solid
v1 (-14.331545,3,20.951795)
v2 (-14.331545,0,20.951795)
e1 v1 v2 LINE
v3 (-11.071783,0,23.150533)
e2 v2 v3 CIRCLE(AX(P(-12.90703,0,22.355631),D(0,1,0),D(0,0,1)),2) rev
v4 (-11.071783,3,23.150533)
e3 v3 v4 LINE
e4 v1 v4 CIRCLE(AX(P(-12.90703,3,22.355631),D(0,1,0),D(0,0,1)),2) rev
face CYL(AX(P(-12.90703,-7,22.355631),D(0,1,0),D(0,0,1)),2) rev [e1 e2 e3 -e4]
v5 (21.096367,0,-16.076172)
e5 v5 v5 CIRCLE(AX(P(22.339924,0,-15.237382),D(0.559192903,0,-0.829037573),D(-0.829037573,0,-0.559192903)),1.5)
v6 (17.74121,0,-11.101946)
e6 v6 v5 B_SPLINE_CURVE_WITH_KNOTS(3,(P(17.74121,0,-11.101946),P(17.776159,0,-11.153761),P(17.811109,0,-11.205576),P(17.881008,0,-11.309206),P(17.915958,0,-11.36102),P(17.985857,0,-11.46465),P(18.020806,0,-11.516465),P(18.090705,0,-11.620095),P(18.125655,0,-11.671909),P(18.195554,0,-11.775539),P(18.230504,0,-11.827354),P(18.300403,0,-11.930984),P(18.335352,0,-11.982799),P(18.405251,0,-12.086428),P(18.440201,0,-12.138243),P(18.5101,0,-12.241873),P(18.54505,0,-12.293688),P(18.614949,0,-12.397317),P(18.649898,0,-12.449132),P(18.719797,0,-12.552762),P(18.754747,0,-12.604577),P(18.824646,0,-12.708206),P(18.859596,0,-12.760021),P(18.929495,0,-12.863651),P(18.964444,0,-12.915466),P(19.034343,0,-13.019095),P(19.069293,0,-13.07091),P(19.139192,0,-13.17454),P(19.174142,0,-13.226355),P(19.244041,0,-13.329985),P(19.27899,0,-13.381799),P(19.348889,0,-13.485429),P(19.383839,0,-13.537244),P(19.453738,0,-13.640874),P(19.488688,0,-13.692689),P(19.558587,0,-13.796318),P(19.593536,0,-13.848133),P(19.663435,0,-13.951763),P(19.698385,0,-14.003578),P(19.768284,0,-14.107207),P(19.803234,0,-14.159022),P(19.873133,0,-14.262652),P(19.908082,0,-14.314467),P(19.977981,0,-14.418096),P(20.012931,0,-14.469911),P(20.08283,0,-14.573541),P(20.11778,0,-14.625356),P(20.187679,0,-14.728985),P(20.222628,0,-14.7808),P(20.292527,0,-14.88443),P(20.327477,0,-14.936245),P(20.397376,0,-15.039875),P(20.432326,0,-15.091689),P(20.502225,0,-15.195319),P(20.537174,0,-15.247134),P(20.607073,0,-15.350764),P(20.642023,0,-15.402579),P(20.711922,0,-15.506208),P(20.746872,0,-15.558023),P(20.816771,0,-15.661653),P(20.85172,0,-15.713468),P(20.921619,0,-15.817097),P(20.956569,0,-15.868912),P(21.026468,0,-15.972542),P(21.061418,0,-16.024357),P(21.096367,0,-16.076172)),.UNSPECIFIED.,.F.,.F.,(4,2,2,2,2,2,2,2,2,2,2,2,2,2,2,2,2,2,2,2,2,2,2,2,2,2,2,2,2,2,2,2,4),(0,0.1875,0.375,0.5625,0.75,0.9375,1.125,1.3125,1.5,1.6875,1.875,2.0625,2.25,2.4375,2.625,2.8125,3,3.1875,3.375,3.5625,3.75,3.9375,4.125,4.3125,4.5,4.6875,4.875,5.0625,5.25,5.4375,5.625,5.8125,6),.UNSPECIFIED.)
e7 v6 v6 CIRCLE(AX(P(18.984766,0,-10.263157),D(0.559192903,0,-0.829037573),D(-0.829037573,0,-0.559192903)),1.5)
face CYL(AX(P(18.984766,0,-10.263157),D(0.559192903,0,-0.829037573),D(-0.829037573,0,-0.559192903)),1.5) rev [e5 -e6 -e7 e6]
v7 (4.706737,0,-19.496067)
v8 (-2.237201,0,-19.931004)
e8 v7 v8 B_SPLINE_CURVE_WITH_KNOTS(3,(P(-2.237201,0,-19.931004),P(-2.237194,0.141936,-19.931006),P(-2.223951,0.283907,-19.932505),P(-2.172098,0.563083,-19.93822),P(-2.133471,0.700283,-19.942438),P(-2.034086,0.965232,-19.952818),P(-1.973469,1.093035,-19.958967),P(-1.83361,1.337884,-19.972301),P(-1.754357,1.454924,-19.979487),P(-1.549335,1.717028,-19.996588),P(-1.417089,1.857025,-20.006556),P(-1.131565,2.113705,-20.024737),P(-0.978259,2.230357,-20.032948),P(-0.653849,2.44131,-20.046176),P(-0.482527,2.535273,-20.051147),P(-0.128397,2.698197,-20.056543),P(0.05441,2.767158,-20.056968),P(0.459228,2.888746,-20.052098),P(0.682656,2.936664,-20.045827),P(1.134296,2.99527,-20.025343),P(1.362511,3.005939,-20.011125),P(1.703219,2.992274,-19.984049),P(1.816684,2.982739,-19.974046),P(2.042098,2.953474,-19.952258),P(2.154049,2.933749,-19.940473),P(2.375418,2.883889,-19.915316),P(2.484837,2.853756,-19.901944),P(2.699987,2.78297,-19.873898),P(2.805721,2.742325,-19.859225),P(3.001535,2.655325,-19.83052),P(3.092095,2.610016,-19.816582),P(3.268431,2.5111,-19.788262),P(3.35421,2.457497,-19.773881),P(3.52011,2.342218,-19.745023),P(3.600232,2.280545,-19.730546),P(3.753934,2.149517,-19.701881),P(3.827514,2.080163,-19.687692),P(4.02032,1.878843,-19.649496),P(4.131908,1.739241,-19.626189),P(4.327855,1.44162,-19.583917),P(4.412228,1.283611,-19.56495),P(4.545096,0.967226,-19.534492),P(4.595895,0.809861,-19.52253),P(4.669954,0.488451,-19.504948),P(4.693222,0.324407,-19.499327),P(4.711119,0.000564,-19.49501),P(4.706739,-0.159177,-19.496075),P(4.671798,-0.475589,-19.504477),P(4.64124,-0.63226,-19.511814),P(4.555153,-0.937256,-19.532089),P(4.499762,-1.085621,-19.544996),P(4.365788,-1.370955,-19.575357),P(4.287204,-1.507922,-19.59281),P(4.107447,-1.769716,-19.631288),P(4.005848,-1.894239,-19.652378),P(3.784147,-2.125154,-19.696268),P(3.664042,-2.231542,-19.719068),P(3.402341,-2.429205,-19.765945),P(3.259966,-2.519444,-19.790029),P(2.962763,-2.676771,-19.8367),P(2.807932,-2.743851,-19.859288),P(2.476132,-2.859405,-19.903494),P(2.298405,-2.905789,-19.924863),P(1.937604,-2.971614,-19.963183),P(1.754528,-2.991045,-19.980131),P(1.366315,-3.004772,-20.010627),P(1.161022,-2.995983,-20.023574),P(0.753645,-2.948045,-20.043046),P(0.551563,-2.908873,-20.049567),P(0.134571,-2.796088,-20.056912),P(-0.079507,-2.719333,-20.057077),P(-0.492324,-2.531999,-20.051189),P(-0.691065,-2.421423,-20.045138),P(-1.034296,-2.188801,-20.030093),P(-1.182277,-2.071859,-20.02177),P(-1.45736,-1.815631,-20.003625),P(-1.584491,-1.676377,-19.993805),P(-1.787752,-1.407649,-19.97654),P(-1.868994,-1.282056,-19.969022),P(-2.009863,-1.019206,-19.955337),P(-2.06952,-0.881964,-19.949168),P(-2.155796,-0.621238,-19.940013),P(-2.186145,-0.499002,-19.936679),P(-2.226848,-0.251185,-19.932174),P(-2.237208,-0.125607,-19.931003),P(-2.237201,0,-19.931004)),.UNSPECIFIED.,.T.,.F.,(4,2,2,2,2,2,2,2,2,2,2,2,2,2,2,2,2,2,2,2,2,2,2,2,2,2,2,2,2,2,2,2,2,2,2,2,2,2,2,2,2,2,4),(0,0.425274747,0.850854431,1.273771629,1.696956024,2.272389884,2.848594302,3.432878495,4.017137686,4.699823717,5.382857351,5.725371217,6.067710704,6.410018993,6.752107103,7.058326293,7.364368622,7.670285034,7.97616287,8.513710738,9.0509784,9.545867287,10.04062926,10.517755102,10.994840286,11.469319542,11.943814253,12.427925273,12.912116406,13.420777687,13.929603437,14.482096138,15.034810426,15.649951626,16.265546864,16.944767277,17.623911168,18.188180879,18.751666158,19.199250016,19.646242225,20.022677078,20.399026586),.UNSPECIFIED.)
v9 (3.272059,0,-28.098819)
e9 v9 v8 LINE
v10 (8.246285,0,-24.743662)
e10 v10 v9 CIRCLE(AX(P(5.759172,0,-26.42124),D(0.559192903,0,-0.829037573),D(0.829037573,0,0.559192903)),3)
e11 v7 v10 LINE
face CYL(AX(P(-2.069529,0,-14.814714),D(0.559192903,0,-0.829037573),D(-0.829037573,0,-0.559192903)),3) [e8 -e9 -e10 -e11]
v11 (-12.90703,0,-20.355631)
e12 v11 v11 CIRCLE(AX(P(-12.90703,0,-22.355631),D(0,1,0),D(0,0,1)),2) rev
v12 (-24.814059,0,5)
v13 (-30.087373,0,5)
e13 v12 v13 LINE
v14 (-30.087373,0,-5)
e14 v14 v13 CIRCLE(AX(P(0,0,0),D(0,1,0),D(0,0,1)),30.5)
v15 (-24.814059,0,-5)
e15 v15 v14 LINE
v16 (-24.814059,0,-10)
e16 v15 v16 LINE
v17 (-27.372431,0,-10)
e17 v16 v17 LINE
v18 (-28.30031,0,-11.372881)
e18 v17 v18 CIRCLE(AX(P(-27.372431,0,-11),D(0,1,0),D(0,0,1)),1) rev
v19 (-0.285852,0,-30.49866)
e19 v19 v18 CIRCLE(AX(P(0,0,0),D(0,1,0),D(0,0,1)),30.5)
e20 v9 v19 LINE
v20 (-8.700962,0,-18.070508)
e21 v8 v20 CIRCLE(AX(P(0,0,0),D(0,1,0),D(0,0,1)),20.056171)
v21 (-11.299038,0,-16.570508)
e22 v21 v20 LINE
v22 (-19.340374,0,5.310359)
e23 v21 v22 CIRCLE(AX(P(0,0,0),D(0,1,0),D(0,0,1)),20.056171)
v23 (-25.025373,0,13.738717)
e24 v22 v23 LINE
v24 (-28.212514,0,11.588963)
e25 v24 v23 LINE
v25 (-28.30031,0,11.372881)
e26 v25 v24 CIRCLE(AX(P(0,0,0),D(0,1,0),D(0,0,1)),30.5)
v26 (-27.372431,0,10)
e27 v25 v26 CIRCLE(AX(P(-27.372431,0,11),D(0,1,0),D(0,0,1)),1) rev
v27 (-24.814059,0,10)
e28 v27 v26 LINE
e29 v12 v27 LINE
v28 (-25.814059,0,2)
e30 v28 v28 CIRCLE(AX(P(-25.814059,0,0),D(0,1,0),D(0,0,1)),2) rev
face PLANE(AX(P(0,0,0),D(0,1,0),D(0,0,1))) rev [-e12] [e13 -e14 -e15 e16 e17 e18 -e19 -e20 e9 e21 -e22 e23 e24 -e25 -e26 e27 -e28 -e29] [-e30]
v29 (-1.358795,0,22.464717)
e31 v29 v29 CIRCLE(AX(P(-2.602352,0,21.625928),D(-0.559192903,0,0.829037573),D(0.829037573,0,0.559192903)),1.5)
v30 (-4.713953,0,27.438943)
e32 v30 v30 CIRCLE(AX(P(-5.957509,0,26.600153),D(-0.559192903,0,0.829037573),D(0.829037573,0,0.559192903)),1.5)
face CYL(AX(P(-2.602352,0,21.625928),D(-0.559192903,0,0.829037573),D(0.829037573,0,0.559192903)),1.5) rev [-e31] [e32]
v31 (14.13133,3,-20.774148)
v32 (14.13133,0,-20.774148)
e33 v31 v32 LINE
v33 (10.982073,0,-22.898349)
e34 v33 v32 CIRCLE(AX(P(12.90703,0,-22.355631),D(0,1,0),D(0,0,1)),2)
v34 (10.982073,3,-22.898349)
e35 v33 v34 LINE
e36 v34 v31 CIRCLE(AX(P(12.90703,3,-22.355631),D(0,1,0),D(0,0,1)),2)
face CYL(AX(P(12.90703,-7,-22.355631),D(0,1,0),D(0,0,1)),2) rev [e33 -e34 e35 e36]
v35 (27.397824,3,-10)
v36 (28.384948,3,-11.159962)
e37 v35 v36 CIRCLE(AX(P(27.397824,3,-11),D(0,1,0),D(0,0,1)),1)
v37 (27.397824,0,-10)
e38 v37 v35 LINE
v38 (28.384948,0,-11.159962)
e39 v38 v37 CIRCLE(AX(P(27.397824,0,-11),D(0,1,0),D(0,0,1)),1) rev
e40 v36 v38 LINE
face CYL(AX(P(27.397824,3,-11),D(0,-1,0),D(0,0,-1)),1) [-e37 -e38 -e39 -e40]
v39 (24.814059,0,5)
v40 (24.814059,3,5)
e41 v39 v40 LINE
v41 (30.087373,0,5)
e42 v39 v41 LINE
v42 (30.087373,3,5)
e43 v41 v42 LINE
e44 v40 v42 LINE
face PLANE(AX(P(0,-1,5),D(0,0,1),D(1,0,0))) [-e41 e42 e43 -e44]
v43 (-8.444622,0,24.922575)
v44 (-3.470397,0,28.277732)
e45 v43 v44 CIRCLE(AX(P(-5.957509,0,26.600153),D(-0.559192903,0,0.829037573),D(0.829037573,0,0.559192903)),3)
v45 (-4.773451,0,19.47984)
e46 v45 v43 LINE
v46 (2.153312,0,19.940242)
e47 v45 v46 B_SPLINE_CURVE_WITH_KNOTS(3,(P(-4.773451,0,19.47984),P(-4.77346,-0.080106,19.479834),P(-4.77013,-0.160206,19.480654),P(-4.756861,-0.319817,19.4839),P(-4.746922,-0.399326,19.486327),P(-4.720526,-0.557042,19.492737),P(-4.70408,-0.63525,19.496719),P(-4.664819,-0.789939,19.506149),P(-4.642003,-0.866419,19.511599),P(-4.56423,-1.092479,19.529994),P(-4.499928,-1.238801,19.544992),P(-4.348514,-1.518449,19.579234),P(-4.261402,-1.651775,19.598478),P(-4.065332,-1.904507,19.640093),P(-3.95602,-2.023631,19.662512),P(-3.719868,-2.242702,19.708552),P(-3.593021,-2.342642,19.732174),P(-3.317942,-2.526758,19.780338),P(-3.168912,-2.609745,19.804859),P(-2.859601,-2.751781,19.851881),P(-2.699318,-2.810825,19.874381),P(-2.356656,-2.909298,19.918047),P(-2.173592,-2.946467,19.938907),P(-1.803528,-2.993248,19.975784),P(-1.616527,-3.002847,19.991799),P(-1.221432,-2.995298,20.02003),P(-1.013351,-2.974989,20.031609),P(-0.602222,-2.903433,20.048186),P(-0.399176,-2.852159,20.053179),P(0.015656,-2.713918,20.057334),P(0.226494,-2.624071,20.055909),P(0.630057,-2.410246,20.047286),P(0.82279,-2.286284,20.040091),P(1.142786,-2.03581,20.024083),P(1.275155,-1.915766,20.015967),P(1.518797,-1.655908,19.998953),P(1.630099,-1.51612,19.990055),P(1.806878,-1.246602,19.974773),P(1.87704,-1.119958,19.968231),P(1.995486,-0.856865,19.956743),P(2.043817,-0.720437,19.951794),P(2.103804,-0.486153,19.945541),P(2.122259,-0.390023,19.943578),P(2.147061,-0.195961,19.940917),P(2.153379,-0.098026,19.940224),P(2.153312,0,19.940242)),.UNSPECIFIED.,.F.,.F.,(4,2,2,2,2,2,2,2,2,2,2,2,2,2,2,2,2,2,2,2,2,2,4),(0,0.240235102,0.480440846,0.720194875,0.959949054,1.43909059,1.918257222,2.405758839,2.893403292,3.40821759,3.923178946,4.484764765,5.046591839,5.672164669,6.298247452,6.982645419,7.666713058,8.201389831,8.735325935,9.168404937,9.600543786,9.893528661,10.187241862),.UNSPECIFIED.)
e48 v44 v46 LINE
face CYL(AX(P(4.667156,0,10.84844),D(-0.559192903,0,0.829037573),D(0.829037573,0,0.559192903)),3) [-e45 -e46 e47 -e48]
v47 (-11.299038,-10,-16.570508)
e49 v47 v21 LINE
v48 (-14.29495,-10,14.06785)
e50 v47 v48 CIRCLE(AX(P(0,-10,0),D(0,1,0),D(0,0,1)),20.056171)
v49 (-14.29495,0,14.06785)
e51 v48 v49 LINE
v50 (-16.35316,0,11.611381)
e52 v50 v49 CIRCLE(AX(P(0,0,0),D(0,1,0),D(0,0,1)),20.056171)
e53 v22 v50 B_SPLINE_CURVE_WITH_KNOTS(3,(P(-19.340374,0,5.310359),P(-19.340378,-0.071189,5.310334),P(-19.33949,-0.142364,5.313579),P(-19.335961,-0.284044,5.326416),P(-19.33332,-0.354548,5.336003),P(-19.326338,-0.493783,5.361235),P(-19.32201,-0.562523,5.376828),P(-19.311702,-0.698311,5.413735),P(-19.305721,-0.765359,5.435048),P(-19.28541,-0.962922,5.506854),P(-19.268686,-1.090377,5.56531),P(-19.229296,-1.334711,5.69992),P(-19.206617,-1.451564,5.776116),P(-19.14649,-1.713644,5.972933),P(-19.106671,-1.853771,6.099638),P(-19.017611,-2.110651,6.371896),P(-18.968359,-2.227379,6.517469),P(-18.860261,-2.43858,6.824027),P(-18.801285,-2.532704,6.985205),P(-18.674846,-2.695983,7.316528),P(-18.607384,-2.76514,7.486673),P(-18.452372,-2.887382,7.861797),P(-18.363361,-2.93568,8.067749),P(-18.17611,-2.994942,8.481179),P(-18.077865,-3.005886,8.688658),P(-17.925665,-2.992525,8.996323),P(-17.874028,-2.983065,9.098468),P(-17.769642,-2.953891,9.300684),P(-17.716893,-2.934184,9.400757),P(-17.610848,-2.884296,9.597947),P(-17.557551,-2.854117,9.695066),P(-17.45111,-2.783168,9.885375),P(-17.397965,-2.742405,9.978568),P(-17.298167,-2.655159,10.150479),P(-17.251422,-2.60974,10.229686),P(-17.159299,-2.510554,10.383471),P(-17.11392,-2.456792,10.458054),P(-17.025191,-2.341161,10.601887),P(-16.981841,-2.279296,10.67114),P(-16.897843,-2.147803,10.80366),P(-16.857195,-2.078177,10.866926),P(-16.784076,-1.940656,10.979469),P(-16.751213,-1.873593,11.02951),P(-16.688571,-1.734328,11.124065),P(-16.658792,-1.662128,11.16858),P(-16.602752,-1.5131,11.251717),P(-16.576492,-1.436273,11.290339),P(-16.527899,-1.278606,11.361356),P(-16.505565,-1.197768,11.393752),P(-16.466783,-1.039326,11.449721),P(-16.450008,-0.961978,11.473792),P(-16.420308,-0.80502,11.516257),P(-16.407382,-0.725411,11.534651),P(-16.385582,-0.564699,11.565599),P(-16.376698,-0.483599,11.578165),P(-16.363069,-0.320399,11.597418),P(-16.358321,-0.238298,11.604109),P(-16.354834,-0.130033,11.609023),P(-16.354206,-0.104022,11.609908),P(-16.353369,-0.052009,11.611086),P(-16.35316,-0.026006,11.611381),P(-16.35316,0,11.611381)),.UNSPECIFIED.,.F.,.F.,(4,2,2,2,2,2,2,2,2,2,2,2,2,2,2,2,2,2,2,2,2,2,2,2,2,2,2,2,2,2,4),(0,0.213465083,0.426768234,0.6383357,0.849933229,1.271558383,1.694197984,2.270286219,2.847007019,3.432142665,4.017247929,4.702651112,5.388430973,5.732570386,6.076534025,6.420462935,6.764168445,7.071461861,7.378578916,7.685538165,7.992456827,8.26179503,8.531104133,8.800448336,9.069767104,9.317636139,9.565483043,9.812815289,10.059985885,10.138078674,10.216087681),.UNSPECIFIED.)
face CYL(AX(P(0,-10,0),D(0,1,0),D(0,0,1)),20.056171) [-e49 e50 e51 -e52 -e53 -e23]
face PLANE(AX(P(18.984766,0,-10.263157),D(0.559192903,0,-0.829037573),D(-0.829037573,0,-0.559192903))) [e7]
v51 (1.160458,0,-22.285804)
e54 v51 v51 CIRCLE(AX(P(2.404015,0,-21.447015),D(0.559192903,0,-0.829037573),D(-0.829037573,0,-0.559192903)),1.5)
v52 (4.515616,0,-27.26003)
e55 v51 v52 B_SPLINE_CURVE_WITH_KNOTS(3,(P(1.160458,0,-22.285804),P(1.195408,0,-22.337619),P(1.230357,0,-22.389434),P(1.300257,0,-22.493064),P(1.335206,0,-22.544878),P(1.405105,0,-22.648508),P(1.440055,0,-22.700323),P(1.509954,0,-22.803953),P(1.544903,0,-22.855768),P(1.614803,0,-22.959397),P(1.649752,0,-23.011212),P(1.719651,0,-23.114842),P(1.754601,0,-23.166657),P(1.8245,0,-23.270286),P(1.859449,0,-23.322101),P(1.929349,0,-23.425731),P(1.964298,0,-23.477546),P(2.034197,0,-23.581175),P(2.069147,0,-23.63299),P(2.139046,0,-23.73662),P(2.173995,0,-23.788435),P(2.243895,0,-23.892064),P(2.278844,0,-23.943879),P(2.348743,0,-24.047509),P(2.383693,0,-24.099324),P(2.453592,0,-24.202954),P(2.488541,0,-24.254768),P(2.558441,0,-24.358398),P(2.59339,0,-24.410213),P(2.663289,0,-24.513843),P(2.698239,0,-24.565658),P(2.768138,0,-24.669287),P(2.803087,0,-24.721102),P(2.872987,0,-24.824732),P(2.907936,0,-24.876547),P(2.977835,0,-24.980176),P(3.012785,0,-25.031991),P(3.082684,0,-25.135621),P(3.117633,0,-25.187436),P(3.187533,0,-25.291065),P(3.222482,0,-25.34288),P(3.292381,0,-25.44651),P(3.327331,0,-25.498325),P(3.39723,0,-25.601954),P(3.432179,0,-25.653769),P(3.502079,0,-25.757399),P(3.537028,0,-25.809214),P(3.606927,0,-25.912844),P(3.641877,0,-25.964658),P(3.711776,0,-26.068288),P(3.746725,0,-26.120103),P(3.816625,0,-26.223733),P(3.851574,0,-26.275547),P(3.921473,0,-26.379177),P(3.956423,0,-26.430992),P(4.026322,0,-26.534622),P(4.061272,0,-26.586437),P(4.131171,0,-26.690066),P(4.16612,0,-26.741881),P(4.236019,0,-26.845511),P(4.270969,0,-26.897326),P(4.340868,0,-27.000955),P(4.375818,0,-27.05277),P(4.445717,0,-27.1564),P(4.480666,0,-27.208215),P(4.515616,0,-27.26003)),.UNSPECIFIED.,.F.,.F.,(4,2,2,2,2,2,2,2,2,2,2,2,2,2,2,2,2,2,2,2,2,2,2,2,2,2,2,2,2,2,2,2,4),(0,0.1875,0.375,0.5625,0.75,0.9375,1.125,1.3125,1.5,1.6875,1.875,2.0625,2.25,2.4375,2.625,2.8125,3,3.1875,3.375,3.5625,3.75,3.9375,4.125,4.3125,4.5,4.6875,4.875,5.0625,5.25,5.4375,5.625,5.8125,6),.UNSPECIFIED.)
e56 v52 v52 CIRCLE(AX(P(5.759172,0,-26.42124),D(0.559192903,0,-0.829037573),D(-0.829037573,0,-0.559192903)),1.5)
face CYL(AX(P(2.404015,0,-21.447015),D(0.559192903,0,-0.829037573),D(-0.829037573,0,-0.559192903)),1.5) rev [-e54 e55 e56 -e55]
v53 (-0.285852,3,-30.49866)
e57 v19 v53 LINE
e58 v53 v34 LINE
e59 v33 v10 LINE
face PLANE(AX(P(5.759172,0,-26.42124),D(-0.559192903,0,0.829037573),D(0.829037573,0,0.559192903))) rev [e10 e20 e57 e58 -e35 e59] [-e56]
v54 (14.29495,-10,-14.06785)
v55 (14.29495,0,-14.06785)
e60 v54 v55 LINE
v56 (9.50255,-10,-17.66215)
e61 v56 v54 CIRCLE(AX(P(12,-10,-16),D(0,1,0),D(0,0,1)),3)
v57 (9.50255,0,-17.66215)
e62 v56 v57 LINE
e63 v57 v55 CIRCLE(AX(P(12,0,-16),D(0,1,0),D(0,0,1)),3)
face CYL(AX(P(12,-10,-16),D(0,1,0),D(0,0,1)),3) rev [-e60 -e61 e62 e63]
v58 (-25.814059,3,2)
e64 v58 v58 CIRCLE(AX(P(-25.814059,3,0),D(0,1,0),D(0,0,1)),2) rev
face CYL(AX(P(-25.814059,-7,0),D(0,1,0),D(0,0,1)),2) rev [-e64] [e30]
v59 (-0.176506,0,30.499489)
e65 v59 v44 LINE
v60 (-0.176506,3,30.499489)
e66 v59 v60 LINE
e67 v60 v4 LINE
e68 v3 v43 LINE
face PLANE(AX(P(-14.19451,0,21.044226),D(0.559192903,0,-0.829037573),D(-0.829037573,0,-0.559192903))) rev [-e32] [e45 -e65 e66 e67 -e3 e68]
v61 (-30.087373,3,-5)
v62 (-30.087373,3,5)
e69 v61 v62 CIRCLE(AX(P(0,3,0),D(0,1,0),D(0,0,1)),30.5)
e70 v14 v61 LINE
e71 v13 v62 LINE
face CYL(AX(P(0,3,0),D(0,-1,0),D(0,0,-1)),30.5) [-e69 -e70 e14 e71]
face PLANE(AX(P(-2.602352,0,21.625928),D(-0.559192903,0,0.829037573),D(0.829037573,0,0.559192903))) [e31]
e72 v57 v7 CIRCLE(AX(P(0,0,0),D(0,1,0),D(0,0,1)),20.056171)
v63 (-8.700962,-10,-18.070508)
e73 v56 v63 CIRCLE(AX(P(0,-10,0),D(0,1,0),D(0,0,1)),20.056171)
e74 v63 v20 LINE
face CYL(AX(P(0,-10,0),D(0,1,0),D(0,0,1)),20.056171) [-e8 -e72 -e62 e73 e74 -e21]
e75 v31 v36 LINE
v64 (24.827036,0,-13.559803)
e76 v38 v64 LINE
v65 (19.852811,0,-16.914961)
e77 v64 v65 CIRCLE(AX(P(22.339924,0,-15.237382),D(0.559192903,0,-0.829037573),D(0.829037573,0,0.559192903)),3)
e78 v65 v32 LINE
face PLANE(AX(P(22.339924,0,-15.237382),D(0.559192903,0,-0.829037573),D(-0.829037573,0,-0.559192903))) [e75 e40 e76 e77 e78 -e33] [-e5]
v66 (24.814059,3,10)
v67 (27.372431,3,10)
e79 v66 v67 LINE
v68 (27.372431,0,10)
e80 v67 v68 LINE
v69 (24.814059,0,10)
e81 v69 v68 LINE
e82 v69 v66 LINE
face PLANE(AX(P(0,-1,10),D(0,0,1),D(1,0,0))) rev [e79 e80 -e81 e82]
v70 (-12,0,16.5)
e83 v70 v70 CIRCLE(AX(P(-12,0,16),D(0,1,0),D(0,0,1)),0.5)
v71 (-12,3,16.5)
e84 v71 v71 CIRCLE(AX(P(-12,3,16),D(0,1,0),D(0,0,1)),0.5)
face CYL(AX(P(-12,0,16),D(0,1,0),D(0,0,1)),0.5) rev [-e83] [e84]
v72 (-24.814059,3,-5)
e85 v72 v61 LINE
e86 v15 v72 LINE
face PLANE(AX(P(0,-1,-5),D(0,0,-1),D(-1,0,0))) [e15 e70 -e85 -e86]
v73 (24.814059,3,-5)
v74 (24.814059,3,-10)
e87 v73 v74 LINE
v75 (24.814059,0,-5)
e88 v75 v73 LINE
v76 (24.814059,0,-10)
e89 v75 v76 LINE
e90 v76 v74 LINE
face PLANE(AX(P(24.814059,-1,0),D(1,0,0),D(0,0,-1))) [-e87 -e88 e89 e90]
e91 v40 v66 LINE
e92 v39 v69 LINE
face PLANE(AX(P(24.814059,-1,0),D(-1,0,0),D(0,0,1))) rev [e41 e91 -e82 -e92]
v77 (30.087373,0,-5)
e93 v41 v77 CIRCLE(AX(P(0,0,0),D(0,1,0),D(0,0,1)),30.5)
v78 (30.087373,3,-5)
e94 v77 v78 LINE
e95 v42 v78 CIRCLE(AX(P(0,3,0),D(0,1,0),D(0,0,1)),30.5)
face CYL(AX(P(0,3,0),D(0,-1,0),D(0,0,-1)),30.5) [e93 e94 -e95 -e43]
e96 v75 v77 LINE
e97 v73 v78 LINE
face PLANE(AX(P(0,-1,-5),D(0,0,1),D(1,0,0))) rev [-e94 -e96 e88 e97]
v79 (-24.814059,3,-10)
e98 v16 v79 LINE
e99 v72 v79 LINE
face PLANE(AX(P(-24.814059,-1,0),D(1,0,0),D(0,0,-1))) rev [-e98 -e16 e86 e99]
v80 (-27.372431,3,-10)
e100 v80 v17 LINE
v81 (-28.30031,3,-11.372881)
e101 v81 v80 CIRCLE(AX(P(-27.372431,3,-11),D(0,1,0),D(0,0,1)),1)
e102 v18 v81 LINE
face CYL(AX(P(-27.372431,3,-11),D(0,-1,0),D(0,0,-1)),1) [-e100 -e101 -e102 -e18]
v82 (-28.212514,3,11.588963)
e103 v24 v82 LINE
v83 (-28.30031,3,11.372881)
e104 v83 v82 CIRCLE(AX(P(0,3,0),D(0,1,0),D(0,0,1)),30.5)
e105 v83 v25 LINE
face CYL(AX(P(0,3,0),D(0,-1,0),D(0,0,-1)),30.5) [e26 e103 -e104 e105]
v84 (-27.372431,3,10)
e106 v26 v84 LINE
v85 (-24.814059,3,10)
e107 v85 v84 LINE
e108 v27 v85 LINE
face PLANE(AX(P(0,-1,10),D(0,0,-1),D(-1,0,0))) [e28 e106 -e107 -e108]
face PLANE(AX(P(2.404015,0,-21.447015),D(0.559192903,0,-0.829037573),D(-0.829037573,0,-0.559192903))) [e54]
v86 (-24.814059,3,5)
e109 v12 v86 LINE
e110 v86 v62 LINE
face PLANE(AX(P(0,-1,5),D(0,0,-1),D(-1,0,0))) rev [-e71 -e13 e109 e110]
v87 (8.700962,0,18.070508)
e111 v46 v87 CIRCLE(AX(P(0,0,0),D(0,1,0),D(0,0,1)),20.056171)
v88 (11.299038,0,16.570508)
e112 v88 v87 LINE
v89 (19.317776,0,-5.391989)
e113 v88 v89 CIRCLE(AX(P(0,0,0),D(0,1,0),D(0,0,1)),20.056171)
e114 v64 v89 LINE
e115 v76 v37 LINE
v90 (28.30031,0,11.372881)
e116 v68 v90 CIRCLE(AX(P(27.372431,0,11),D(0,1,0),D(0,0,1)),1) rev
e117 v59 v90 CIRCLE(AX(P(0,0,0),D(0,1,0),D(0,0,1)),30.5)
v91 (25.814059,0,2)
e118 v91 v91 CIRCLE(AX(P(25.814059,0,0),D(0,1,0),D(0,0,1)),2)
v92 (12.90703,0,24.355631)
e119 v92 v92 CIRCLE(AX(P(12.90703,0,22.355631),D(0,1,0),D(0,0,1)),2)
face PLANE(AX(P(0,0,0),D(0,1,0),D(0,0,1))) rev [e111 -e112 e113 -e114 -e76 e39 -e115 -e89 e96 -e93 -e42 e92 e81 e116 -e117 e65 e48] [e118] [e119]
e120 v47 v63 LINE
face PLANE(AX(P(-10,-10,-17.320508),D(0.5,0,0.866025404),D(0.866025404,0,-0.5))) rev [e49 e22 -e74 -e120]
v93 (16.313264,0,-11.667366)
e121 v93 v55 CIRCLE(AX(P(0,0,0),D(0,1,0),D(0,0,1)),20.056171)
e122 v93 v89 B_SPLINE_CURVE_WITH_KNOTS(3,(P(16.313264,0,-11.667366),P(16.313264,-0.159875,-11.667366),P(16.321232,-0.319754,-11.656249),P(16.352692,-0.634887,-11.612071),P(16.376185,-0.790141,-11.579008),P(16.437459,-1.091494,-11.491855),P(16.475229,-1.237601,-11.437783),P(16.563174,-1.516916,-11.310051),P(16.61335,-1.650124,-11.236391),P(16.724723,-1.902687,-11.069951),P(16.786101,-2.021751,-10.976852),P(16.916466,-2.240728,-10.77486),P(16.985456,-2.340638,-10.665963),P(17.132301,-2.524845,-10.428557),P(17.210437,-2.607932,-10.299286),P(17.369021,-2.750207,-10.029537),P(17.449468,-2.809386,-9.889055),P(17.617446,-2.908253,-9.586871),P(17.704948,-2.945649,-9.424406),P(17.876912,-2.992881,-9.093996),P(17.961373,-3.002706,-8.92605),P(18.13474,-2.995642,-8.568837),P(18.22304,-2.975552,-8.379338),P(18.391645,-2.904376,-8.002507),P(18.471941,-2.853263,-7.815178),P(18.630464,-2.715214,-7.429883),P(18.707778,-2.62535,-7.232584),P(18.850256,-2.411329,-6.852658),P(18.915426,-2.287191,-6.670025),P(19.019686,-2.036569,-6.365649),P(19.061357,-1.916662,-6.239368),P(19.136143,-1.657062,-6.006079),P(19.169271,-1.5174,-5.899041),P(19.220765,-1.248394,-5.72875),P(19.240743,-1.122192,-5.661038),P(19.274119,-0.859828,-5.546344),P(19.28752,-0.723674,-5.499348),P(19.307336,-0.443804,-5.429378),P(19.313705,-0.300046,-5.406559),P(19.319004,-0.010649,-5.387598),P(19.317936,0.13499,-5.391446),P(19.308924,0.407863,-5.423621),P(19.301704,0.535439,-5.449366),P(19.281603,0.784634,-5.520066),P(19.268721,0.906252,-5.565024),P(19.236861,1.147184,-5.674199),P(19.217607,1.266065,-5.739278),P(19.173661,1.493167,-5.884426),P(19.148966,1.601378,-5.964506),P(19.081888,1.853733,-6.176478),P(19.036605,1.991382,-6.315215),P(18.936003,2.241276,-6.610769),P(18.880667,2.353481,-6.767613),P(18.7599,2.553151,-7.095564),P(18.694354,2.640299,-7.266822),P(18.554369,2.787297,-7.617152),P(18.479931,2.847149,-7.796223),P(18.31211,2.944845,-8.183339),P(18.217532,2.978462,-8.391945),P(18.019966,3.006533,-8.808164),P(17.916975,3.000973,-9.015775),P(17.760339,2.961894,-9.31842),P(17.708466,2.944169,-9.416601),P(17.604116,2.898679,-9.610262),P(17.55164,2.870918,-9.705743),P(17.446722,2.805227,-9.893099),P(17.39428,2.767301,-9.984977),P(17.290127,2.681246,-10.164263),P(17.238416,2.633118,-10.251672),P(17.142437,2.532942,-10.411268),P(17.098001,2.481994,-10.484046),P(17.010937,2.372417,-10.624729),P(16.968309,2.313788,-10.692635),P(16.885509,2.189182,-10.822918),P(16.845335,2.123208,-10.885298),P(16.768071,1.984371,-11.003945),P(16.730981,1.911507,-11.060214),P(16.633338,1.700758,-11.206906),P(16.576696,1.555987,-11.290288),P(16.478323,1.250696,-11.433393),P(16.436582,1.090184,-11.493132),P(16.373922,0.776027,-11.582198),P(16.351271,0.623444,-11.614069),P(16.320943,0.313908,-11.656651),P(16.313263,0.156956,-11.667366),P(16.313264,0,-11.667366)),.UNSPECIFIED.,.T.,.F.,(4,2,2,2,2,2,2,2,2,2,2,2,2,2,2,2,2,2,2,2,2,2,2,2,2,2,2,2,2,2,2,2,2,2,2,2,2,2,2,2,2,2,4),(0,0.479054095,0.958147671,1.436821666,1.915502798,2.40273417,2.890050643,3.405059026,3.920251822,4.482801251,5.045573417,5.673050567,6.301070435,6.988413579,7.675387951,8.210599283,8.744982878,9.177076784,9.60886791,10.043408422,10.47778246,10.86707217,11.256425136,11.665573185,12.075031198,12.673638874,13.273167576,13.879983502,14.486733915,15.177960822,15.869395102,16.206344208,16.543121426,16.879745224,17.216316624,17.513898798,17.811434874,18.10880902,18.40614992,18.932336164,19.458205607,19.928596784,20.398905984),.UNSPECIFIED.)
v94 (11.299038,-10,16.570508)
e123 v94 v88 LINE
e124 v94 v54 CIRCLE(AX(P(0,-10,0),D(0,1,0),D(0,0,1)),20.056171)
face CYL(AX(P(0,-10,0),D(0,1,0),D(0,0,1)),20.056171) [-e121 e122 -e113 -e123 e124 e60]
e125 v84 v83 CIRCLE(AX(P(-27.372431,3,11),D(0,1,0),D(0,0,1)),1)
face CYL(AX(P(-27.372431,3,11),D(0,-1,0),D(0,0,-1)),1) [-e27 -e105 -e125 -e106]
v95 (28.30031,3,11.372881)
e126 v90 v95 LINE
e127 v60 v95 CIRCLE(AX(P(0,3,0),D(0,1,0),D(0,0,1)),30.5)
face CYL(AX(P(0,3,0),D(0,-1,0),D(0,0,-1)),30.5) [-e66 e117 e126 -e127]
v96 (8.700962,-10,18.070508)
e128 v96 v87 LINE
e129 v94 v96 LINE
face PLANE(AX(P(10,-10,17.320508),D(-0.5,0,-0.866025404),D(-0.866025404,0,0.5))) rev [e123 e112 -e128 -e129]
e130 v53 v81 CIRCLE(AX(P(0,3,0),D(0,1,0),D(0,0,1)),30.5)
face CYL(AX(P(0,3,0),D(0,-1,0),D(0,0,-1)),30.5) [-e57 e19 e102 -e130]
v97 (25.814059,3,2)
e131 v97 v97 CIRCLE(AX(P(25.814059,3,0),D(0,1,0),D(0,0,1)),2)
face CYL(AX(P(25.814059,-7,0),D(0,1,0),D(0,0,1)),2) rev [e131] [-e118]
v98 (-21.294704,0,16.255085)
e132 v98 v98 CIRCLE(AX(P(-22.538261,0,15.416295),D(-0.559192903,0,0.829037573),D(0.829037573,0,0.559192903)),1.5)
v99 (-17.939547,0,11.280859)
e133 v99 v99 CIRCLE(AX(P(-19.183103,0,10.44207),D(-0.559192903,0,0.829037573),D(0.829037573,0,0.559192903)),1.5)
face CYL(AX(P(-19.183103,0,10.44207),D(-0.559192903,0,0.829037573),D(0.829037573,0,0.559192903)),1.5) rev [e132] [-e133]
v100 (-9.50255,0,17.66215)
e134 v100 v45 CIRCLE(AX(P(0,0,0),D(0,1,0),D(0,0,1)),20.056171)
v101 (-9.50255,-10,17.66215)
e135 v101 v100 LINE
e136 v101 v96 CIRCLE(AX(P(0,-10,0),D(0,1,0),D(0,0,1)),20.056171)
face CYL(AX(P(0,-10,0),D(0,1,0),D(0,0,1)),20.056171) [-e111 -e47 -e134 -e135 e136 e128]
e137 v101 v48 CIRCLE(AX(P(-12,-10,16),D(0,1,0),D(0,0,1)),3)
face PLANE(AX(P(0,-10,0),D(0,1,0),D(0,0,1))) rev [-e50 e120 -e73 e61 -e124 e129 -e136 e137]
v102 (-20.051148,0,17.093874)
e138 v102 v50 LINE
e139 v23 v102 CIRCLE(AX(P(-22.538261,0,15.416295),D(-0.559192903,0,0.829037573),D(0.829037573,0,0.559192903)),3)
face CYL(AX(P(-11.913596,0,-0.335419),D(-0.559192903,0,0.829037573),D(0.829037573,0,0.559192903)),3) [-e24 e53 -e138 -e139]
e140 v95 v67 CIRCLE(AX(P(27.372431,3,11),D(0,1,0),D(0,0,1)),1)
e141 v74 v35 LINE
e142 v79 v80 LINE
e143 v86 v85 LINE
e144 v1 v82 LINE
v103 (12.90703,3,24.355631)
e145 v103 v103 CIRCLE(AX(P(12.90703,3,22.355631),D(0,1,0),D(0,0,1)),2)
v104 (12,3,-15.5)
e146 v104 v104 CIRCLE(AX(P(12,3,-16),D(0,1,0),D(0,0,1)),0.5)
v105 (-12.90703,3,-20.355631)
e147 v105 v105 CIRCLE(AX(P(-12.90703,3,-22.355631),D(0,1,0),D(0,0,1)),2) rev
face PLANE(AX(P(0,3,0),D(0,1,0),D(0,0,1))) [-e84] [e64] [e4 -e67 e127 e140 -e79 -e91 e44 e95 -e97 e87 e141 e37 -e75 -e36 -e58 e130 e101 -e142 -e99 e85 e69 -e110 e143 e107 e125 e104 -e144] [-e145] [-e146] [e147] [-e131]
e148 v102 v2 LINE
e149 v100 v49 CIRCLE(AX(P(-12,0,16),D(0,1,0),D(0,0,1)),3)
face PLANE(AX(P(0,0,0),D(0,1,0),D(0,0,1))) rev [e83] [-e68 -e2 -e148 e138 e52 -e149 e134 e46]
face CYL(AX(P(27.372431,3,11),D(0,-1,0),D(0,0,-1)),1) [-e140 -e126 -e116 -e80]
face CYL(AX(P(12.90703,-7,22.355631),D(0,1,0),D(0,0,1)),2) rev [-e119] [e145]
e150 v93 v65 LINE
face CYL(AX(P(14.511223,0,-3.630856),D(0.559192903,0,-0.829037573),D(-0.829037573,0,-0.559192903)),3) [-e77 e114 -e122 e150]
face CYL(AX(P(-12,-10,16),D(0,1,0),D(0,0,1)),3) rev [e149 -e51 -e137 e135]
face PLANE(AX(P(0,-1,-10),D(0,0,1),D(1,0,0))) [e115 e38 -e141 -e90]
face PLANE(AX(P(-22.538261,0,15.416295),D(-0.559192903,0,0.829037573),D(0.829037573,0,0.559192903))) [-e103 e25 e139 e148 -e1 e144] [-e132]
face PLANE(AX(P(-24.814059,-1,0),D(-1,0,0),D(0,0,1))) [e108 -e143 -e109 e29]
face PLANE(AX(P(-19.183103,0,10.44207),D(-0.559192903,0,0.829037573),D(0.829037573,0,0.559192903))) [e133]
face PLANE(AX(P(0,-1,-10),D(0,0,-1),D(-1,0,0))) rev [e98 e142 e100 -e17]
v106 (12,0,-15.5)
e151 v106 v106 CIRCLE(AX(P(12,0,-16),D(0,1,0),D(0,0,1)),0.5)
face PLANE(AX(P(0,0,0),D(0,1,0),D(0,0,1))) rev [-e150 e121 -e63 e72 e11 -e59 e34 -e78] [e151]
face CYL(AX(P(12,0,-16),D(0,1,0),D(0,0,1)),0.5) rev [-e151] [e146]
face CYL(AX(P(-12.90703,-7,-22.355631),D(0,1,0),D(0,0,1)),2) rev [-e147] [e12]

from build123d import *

# Parameters (mm, degrees)
CROQUIS1_R              = 30.5
SALIENTE_EXTRUIR1_DEPTH = 3
CORTAR_EXTRUIR3_START   = -4
CORTAR_EXTRUIR3_DEPTH   = 4
CORTAR_EXTRUIR4_DEPTH   = 10
CROQUIS8_R              = 0.5
CORTAR_EXTRUIR5_DEPTH   = 3
SALIENTE_EXTRUIR2_DEPTH = 13
CROQUIS11_W             = 34.583232932
CROQUIS11_H             = 3
SALIENTE_EXTRUIR3_DEPTH = 6
CROQUIS12_R             = 2
CORTAR_EXTRUIR7_DEPTH   = 3
SALIENTE_EXTRUIR4_DEPTH = 20
CROQUIS14_R             = 1.5
CORTAR_EXTRUIR8_DEPTH   = 6
CORTAR_EXTRUIR9_START   = -3
CORTAR_EXTRUIR9_DEPTH   = 3
CROQUIS16_W             = 33.68877148
CROQUIS16_H             = 3
SALIENTE_EXTRUIR5_DEPTH = 6
CROQUIS17_R             = 2
CORTAR_EXTRUIR10_DEPTH  = 3
CROQUIS18_R             = 3
SALIENTE_EXTRUIR6_DEPTH = 25
CROQUIS19_R             = 1.5
CORTAR_EXTRUIR11_DEPTH  = 5
CORTAR_EXTRUIR12_DEPTH  = 6
CORTAR_EXTRUIR13_DEPTH  = 6
CROQUIS22_R             = 1.5
CORTAR_EXTRUIR14_DEPTH  = 6
CROQUIS23_R             = 1.5
CORTAR_EXTRUIR15_DEPTH  = 6
REDONDEO1_R             = 1


with BuildPart() as part:
    # Croquis1 → Saliente-Extruir1 (new body)
    with BuildSketch(Plane(origin=(0, 0, 0), x_dir=(1, 0, 0), z_dir=(0, 1, 0))):
        with Locations(Location((0, 0, 0), (0, 0, 270))):
            Circle(CROQUIS1_R)
    extrude(amount=SALIENTE_EXTRUIR1_DEPTH)

    # Croquis5 → Cortar-Extruir3 (cut)
    with BuildSketch(Plane(origin=(0, 3, 0), x_dir=(1, 0, 0), z_dir=(0, 1, 0)).offset(CORTAR_EXTRUIR3_START)):
        with BuildLine():
            ThreePointArc((-30.087372767, -5), (-29.556634924, -7.526973624), (-28.814059068, -10))
            Line((-28.814059068, -10), (-24.814059068, -10))
            Line((-24.814059068, -10), (-24.814059068, -5))
            Line((-24.814059068, -5), (-28.814059068, -5))
            Line((-28.814059068, -5), (-30.087372767, -5))
        make_face()
        with BuildLine():
            ThreePointArc((-28.814059068, 10), (-29.556634924, 7.526973624), (-30.087372767, 5))
            Line((-30.087372767, 5), (-28.814059068, 5))
            Line((-28.814059068, 5), (-24.814059068, 5))
            Line((-24.814059068, 5), (-24.814059068, 10))
            Line((-24.814059068, 10), (-28.814059068, 10))
        make_face()
        with BuildLine():
            Line((28.814059068, 5), (30.087372767, 5))
            ThreePointArc((30.087372767, 5), (29.556634924, 7.526973624), (28.814059068, 10))
            Line((28.814059068, 10), (24.814059068, 10))
            Line((24.814059068, 10), (24.814059068, 5))
            Line((24.814059068, 5), (28.814059068, 5))
        make_face()
        with BuildLine():
            Line((30.087372767, -5), (28.814059068, -5))
            Line((28.814059068, -5), (24.814059068, -5))
            Line((24.814059068, -5), (24.814059068, -10))
            Line((24.814059068, -10), (28.814059068, -10))
            ThreePointArc((28.814059068, -10), (29.556634924, -7.526973624), (30.087372767, -5))
        make_face()
    extrude(amount=CORTAR_EXTRUIR3_DEPTH, mode=Mode.SUBTRACT)

    # Croquis7 → Cortar-Extruir4 (cut)
    with BuildSketch(Plane(origin=(0, 3, 0), x_dir=(1, 0, 0), z_dir=(0, 1, 0))):
        with BuildLine():
            ThreePointArc((-13.907029535, 20.623580122), (-11.907029535, 20.623580122), (-10.907029535, 22.355630929))
            Line((-10.907029535, 22.355630929), (-12.907029535, 22.355630929))
            Line((-12.907029535, 22.355630929), (-13.907029535, 20.623580122))
        make_face()
        with BuildLine():
            Line((-12.907029535, 22.355630929), (-10.907029535, 22.355630929))
            ThreePointArc((-10.907029535, 22.355630929), (-13.907029535, 24.087681737), (-13.907029535, 20.623580122))
            Line((-13.907029535, 20.623580122), (-12.907029535, 22.355630929))
        make_face()
        with BuildLine():
            ThreePointArc((-23.81405907, 0), (-24.082008262, 1), (-24.81405907, 1.732050808))
            Line((-24.81405907, 1.732050808), (-25.81405907, 0))
            Line((-25.81405907, 0), (-24.81405907, -1.732050808))
            ThreePointArc((-24.81405907, -1.732050808), (-24.082008262, -1), (-23.81405907, 0))
        make_face()
        with BuildLine():
            Line((-25.81405907, 0), (-24.81405907, 1.732050808))
            ThreePointArc((-24.81405907, 1.732050808), (-27.81405907, 0), (-24.81405907, -1.732050808))
            Line((-24.81405907, -1.732050808), (-25.81405907, 0))
        make_face()
        with BuildLine():
            ThreePointArc((10.907029535, 22.355630929), (11.907029535, 20.623580122), (13.907029535, 20.623580122))
            Line((13.907029535, 20.623580122), (12.907029535, 22.355630929))
            Line((12.907029535, 22.355630929), (10.907029535, 22.355630929))
        make_face()
        with BuildLine():
            Line((12.907029535, 22.355630929), (13.907029535, 20.623580122))
            ThreePointArc((13.907029535, 20.623580122), (14.639080343, 21.355630929), (14.907029535, 22.355630929))
            ThreePointArc((14.907029535, 22.355630929), (12.907029535, 24.355630929), (10.907029535, 22.355630929))
            Line((10.907029535, 22.355630929), (12.907029535, 22.355630929))
        make_face()
        with BuildLine():
            Line((24.81405907, -1.732050808), (25.81405907, 0))
            Line((25.81405907, 0), (24.81405907, 1.732050808))
            ThreePointArc((24.81405907, 1.732050808), (23.81405907, 0), (24.81405907, -1.732050808))
        make_face()
        with BuildLine():
            Line((24.81405907, 1.732050808), (25.81405907, 0))
            Line((25.81405907, 0), (24.81405907, -1.732050808))
            ThreePointArc((24.81405907, -1.732050808), (26.81405907, -1.732050808), (27.81405907, 0))
            ThreePointArc((27.81405907, 0), (26.81405907, 1.732050808), (24.81405907, 1.732050808))
        make_face()
        with BuildLine():
            ThreePointArc((-13.907029535, -20.623580122), (-13.907029535, -24.087681737), (-10.907029535, -22.355630929))
            Line((-10.907029535, -22.355630929), (-12.907029535, -22.355630929))
            Line((-12.907029535, -22.355630929), (-13.907029535, -20.623580122))
        make_face()
        with BuildLine():
            Line((-12.907029535, -22.355630929), (-10.907029535, -22.355630929))
            ThreePointArc((-10.907029535, -22.355630929), (-11.907029535, -20.623580122), (-13.907029535, -20.623580122))
            Line((-13.907029535, -20.623580122), (-12.907029535, -22.355630929))
        make_face()
        with BuildLine():
            ThreePointArc((14.907029535, -22.355630929), (14.639080343, -21.355630929), (13.907029535, -20.623580122))
            Line((13.907029535, -20.623580122), (12.907029535, -22.355630929))
            Line((12.907029535, -22.355630929), (10.907029535, -22.355630929))
            ThreePointArc((10.907029535, -22.355630929), (12.907029535, -24.355630929), (14.907029535, -22.355630929))
        make_face()
        with BuildLine():
            Line((12.907029535, -22.355630929), (13.907029535, -20.623580122))
            ThreePointArc((13.907029535, -20.623580122), (11.907029535, -20.623580122), (10.907029535, -22.355630929))
            Line((10.907029535, -22.355630929), (12.907029535, -22.355630929))
        make_face()
    extrude(amount=-CORTAR_EXTRUIR4_DEPTH, mode=Mode.SUBTRACT)

    # Croquis8 → Cortar-Extruir5 (cut)
    with BuildSketch(Plane(origin=(0, 3, 0), x_dir=(1, 0, 0), z_dir=(0, 1, 0))):
        with Locations(Location((12, 16, 0), (0, 0, 270))):
            Circle(CROQUIS8_R)
        with Locations(Location((-12, -16, 0), (0, 0, 270))):
            Circle(CROQUIS8_R)
    extrude(amount=-CORTAR_EXTRUIR5_DEPTH, mode=Mode.SUBTRACT)

    # Croquis9 → Saliente-Extruir2 (add)
    with BuildSketch(Plane(origin=(0, 3, 0), x_dir=(1, 0, 0), z_dir=(0, 1, 0))):
        with BuildLine():
            Line((-8.700961894, 18.070508076), (-10, 17.320508076))
            Line((-10, 17.320508076), (-11.299038106, 16.570508076))
            ThreePointArc((-11.299038106, 16.570508076), (-19.960969499, 1.951844427), (-14.294950117, -14.067849912))
            ThreePointArc((-14.294950117, -14.067849912), (-10.97161543, -13.181769141), (-9, -16))
            ThreePointArc((-9, -16), (-9.12838457, -16.868230859), (-9.502549883, -17.662150088))
            ThreePointArc((-9.502549883, -17.662150088), (-0.449805389, -20.05112653), (8.700961894, -18.070508076))
            Line((8.700961894, -18.070508076), (10, -17.320508076))
            Line((10, -17.320508076), (11.299038106, -16.570508076))
            ThreePointArc((11.299038106, -16.570508076), (17.732250869, -9.371087404), (20.05617112, 0))
            ThreePointArc((20.05617112, 0), (18.560064193, 7.600922125), (14.294950117, 14.067849912))
            ThreePointArc((14.294950117, 14.067849912), (10.2, 13.6), (9.502549883, 17.662150088))
            ThreePointArc((9.502549883, 17.662150088), (0.449805389, 20.05112653), (-8.700961894, 18.070508076))
        make_face()
    extrude(amount=-SALIENTE_EXTRUIR2_DEPTH)

    # Croquis11 → Saliente-Extruir3 (add)
    with BuildSketch(Plane(origin=(14.04954782, 0, -20.829311224), x_dir=(-0.8290375725550414, 0, -0.5591929034707472), z_dir=(0.5591929034707472, 0, -0.8290375725550414))):
        with Locations((0, 1.5)):
            Rectangle(CROQUIS11_W, CROQUIS11_H)
    extrude(amount=SALIENTE_EXTRUIR3_DEPTH)

    # Croquis12 → Cortar-Extruir7 (cut)
    with BuildSketch(Plane(origin=(0, 3, 0), x_dir=(1, 0, 0), z_dir=(0, 1, 0))):
        with Locations(Location((12.907029535, 22.355630929, 0), (0, 0, 270))):
            Circle(CROQUIS12_R)
    extrude(amount=-CORTAR_EXTRUIR7_DEPTH, mode=Mode.SUBTRACT)

    # Croquis13 → Saliente-Extruir4 (add)
    with BuildSketch(Plane(origin=(17.404705241, 0, -25.803536659), x_dir=(-0.8290375725550414, 0, -0.5591929034707472), z_dir=(0.5591929034707472, 0, -0.8290375725550414))):
        with BuildLine():
            ThreePointArc((10, 3), (7.878679656, 2.121320344), (7, 0))
            Line((7, 0), (8.5, 0))
            ThreePointArc((8.5, 0), (10, 1.5), (11.5, 0))
            Line((11.5, 0), (13, 0))
            ThreePointArc((13, 0), (12.121320344, 2.121320344), (10, 3))
        make_face()
        with BuildLine():
            Line((8.5, 0), (7, 0))
            ThreePointArc((7, 0), (10, -3), (13, 0))
            Line((13, 0), (11.5, 0))
            ThreePointArc((11.5, 0), (10, -1.5), (8.5, 0))
        make_face()
        with BuildLine():
            ThreePointArc((-11.5, 0), (-10, 1.5), (-8.5, 0))
            Line((-8.5, 0), (-7, 0))
            ThreePointArc((-7, 0), (-7.878679656, 2.121320343), (-9.999999999, 3))
            ThreePointArc((-9.999999999, 3), (-12.121320343, 2.121320344), (-13, 0))
            Line((-13, 0), (-11.5, 0))
        make_face()
        with BuildLine():
            Line((-7, 0), (-8.5, 0))
            ThreePointArc((-8.5, 0), (-10, -1.5), (-11.5, 0))
            Line((-11.5, 0), (-13, 0))
            ThreePointArc((-13, 0), (-10, -3), (-7, 0))
        make_face()
        with BuildLine():
            ThreePointArc((-11.5, 0), (-10, -1.5), (-8.5, 0))
            Line((-8.5, 0), (-11.5, 0))
        make_face()
        with BuildLine():
            Line((-11.5, 0), (-8.5, 0))
            ThreePointArc((-8.5, 0), (-10, 1.5), (-11.5, 0))
        make_face()
        with BuildLine():
            ThreePointArc((11.5, 0), (10, 1.5), (8.5, 0))
            Line((8.5, 0), (11.5, 0))
        make_face()
        with BuildLine():
            Line((11.5, 0), (8.5, 0))
            ThreePointArc((8.5, 0), (10, -1.5), (11.5, 0))
        make_face()
    extrude(amount=-SALIENTE_EXTRUIR4_DEPTH)

    # Croquis14 → Cortar-Extruir8 (cut)
    with BuildSketch(Plane(origin=(17.404705241, 0, -25.803536659), x_dir=(-0.8290375725550414, 0, -0.5591929034707472), z_dir=(0.5591929034707472, 0, -0.8290375725550414))):
        with Locations((-10, 0)):
            Circle(CROQUIS14_R)
        with Locations((10, 0)):
            Circle(CROQUIS14_R)
    extrude(amount=-CORTAR_EXTRUIR8_DEPTH, mode=Mode.SUBTRACT)

    # Croquis15 → Cortar-Extruir9 (cut)
    with BuildSketch(Plane(origin=(0, 3, 0), x_dir=(1, 0, 0), z_dir=(0, 1, 0)).offset(CORTAR_EXTRUIR9_START)):
        with BuildLine():
            ThreePointArc((-28.212513648, -11.588963441), (-17.055383556, -25.285645963), (-0.176506165, -30.499489267))
            Line((-0.176506165, -30.499489267), (-11.071782568, -23.15053254))
            ThreePointArc((-11.071782568, -23.15053254), (-14.025415342, -24.013706075), (-14.331545089, -20.951794957))
            Line((-14.331545089, -20.951794957), (-28.212513648, -11.588963441))
        make_face()
    extrude(amount=CORTAR_EXTRUIR9_DEPTH, mode=Mode.SUBTRACT)

    # Croquis16 → Saliente-Extruir5 (add)
    with BuildSketch(Plane(origin=(-14.194509906, 0, 21.044226354), x_dir=(0.8290375725550415, 0, 0.5591929034707472), z_dir=(-0.5591929034707471, 0, 0.8290375725550414))):
        with Locations((-0.064381976, 1.5)):
            Rectangle(CROQUIS16_W, CROQUIS16_H)
    extrude(amount=SALIENTE_EXTRUIR5_DEPTH)

    # Croquis17 → Cortar-Extruir10 (cut)
    with BuildSketch(Plane(origin=(0, 3, 0), x_dir=(1, 0, 0), z_dir=(0, 1, 0))):
        with Locations(Location((-12.907029535, -22.355630929, 0), (0, 0, 270))):
            Circle(CROQUIS17_R)
    extrude(amount=-CORTAR_EXTRUIR10_DEPTH, mode=Mode.SUBTRACT)

    # Croquis18 → Saliente-Extruir6 (add)
    with BuildSketch(Plane(origin=(-17.549667327, 0, 26.01845179), x_dir=(0.8290375725550416, 0, 0.5591929034707471), z_dir=(-0.5591929034707471, 0, 0.8290375725550416))):
        with Locations((9.935618024, 0)):
            Circle(CROQUIS18_R)
        with Locations((-10.064381976, 0)):
            Circle(CROQUIS18_R)
    extrude(amount=-SALIENTE_EXTRUIR6_DEPTH)

    # Croquis19 → Cortar-Extruir11 (cut)
    with BuildSketch(Plane(origin=(-17.549667327, 0, 26.01845179), x_dir=(0.8290375725550416, 0, 0.5591929034707471), z_dir=(-0.5591929034707471, 0, 0.8290375725550416))):
        with Locations((-10.064381976, 0)):
            Circle(CROQUIS19_R)
        with Locations((9.935618024, 0)):
            Circle(CROQUIS19_R)
    extrude(amount=-CORTAR_EXTRUIR11_DEPTH, mode=Mode.SUBTRACT)

    # Croquis20 → Cortar-Extruir12 (cut)
    with BuildSketch(Plane(origin=(17.404705241, 0, -25.803536659), x_dir=(-0.8290375725550413, 0, -0.5591929034707475), z_dir=(0.5591929034707475, 0, -0.8290375725550414))):
        with BuildLine():
            Line((17.291616466, 3), (17.291616466, 0))
            Line((17.291616466, 0), (13, 0))
            ThreePointArc((13, 0), (10, -3), (7, 0))
            Line((7, 0), (-7, 0))
            ThreePointArc((-7, 0), (-10, -3), (-13, 0))
            Line((-13, 0), (-17.291616466, 0))
            Line((-17.291616466, 0), (-17.291616466, 3))
            Line((-17.291616466, 3), (17.291616466, 3))
        make_face()
    extrude(amount=-CORTAR_EXTRUIR12_DEPTH, mode=Mode.SUBTRACT)

    # Croquis21 → Cortar-Extruir13 (cut)
    with BuildSketch(Plane(origin=(-17.549667327, 0, 26.01845179), x_dir=(0.8290375725550416, 0, 0.5591929034707471), z_dir=(-0.5591929034707471, 0, 0.8290375725550416))):
        with BuildLine():
            Line((-13.064381976, 0), (-16.908767716, 0))
            Line((-16.908767716, 0), (-16.908767716, 3))
            Line((-16.908767716, 3), (16.780003764, 3))
            Line((16.780003764, 3), (16.780003764, 0))
            Line((16.780003764, 0), (12.935618024, 0))
            ThreePointArc((12.935618024, 0), (9.935618024, -3), (6.935618024, 0))
            Line((6.935618024, 0), (-7.064381976, 0))
            ThreePointArc((-7.064381976, 0), (-10.064381976, -3), (-13.064381976, 0))
        make_face()
    extrude(amount=-CORTAR_EXTRUIR13_DEPTH, mode=Mode.SUBTRACT)

    # Croquis22 → Cortar-Extruir14 (cut)
    with BuildSketch(Plane(origin=(-14.194509906, 0, 21.044226354), x_dir=(0.8290375725550415, 0, 0.5591929034707471), z_dir=(-0.5591929034707471, 0, 0.8290375725550415))):
        with Locations((-10.064381976, 0)):
            Circle(CROQUIS22_R)
        with Locations((9.935618024, 0)):
            Circle(CROQUIS22_R)
    extrude(amount=-CORTAR_EXTRUIR14_DEPTH, mode=Mode.SUBTRACT)

    # Croquis23 → Cortar-Extruir15 (cut)
    with BuildSketch(Plane(origin=(14.04954782, 0, -20.829311224), x_dir=(-0.8290375725550414, 0, -0.5591929034707472), z_dir=(0.5591929034707472, 0, -0.8290375725550414))):
        with Locations((-10, 0)):
            Circle(CROQUIS23_R)
        with Locations((10, 0)):
            Circle(CROQUIS23_R)
    extrude(amount=-CORTAR_EXTRUIR15_DEPTH, mode=Mode.SUBTRACT)

    # Redondeo1
    # the kernel refuses this fillet: 1 mm, written as the material it takes off along each edge
    with BuildSketch(Plane(origin=(-28.814059068, -3.664646039, 10), x_dir=(0.3504763124105457, 0, 0.9365715960027324), z_dir=(0, 1, 0))) as redondeo1_piece_1:
        with BuildLine():
            CenterArc((1.44182795, 0.999711227), REDONDEO1_R, 159.48354873, 111.893428089)
            Line((0.505256354, 1.350187539), (0.486524922, 1.357197065))
            Line((0.486524922, 1.357197065), (-0.018731432, 0.007009526))
            Line((-0.018731432, 0.007009526), (-0.000480609, -0.019994225))
            ThreePointArc((-0.000480609, -0.019994225), (0.732929208, -0.028807587), (1.466339025, -0.019994225))
            Line((1.466339025, -0.019994225), (1.465858416, 0))
        make_face()
    extrude(amount=10.329292079, mode=Mode.SUBTRACT)
    with BuildSketch(Plane(origin=(-28.814059068, -3.664646039, -10), x_dir=(1, 0, 0), z_dir=(0, 1, 0))) as redondeo1_piece_2:
        with BuildLine():
            CenterArc((1.441627682, 1), REDONDEO1_R, 158.106571911, 111.893428089)
            Line((0.513748652, 1.372881356), (0.495191071, 1.380338983))
            ThreePointArc((0.495191071, 1.380338983), (0.229893958, 0.696537055), (-0.018894465, 0.006557377))
            Line((-0.018894465, 0.006557377), (0, -0.02))
            Line((0, -0.02), (1.441627682, -0.02))
            Line((1.441627682, -0.02), (1.441627682, 0))
        make_face()
    extrude(amount=10.329292079, mode=Mode.SUBTRACT)
    with BuildSketch(Plane(origin=(28.814059068, -3.540586699, -10), x_dir=(-1, 0, 0), z_dir=(0, 1, 0))) as redondeo1_piece_3:
        with BuildLine():
            CenterArc((1.41623468, -1), REDONDEO1_R, 90, 99.20469094)
            Line((0.429111508, -1.159962006), (0.409369044, -1.163161246))
            ThreePointArc((0.409369044, -1.163161246), (0.189917894, -0.58909543), (-0.018894465, -0.006557377))
            Line((-0.018894465, -0.006557377), (0, 0.02))
            Line((0, 0.02), (1.41623468, 0.02))
            Line((1.41623468, 0.02), (1.41623468, 0))
        make_face()
    extrude(amount=10.081173399, mode=Mode.SUBTRACT)
    with BuildSketch(Plane(origin=(28.814059068, -3.664646039, 10), x_dir=(-0.35047631241054894, 0, 0.9365715960027313), z_dir=(0, 1, 0))) as redondeo1_piece_4:
        with BuildLine():
            CenterArc((1.44182795, -0.999711227), REDONDEO1_R, 88.623023181, 111.893428089)
            Line((0.505256354, -1.350187539), (0.486524922, -1.357197065))
            Line((0.486524922, -1.357197065), (-0.018731432, -0.007009526))
            Line((-0.018731432, -0.007009526), (-0.000480609, 0.019994225))
            ThreePointArc((-0.000480609, 0.019994225), (0.732929208, 0.028807587), (1.466339025, 0.019994225))
            Line((1.466339025, 0.019994225), (1.465858416, 0))
        make_face()
    extrude(amount=10.329292079, mode=Mode.SUBTRACT)


solid = part.part
